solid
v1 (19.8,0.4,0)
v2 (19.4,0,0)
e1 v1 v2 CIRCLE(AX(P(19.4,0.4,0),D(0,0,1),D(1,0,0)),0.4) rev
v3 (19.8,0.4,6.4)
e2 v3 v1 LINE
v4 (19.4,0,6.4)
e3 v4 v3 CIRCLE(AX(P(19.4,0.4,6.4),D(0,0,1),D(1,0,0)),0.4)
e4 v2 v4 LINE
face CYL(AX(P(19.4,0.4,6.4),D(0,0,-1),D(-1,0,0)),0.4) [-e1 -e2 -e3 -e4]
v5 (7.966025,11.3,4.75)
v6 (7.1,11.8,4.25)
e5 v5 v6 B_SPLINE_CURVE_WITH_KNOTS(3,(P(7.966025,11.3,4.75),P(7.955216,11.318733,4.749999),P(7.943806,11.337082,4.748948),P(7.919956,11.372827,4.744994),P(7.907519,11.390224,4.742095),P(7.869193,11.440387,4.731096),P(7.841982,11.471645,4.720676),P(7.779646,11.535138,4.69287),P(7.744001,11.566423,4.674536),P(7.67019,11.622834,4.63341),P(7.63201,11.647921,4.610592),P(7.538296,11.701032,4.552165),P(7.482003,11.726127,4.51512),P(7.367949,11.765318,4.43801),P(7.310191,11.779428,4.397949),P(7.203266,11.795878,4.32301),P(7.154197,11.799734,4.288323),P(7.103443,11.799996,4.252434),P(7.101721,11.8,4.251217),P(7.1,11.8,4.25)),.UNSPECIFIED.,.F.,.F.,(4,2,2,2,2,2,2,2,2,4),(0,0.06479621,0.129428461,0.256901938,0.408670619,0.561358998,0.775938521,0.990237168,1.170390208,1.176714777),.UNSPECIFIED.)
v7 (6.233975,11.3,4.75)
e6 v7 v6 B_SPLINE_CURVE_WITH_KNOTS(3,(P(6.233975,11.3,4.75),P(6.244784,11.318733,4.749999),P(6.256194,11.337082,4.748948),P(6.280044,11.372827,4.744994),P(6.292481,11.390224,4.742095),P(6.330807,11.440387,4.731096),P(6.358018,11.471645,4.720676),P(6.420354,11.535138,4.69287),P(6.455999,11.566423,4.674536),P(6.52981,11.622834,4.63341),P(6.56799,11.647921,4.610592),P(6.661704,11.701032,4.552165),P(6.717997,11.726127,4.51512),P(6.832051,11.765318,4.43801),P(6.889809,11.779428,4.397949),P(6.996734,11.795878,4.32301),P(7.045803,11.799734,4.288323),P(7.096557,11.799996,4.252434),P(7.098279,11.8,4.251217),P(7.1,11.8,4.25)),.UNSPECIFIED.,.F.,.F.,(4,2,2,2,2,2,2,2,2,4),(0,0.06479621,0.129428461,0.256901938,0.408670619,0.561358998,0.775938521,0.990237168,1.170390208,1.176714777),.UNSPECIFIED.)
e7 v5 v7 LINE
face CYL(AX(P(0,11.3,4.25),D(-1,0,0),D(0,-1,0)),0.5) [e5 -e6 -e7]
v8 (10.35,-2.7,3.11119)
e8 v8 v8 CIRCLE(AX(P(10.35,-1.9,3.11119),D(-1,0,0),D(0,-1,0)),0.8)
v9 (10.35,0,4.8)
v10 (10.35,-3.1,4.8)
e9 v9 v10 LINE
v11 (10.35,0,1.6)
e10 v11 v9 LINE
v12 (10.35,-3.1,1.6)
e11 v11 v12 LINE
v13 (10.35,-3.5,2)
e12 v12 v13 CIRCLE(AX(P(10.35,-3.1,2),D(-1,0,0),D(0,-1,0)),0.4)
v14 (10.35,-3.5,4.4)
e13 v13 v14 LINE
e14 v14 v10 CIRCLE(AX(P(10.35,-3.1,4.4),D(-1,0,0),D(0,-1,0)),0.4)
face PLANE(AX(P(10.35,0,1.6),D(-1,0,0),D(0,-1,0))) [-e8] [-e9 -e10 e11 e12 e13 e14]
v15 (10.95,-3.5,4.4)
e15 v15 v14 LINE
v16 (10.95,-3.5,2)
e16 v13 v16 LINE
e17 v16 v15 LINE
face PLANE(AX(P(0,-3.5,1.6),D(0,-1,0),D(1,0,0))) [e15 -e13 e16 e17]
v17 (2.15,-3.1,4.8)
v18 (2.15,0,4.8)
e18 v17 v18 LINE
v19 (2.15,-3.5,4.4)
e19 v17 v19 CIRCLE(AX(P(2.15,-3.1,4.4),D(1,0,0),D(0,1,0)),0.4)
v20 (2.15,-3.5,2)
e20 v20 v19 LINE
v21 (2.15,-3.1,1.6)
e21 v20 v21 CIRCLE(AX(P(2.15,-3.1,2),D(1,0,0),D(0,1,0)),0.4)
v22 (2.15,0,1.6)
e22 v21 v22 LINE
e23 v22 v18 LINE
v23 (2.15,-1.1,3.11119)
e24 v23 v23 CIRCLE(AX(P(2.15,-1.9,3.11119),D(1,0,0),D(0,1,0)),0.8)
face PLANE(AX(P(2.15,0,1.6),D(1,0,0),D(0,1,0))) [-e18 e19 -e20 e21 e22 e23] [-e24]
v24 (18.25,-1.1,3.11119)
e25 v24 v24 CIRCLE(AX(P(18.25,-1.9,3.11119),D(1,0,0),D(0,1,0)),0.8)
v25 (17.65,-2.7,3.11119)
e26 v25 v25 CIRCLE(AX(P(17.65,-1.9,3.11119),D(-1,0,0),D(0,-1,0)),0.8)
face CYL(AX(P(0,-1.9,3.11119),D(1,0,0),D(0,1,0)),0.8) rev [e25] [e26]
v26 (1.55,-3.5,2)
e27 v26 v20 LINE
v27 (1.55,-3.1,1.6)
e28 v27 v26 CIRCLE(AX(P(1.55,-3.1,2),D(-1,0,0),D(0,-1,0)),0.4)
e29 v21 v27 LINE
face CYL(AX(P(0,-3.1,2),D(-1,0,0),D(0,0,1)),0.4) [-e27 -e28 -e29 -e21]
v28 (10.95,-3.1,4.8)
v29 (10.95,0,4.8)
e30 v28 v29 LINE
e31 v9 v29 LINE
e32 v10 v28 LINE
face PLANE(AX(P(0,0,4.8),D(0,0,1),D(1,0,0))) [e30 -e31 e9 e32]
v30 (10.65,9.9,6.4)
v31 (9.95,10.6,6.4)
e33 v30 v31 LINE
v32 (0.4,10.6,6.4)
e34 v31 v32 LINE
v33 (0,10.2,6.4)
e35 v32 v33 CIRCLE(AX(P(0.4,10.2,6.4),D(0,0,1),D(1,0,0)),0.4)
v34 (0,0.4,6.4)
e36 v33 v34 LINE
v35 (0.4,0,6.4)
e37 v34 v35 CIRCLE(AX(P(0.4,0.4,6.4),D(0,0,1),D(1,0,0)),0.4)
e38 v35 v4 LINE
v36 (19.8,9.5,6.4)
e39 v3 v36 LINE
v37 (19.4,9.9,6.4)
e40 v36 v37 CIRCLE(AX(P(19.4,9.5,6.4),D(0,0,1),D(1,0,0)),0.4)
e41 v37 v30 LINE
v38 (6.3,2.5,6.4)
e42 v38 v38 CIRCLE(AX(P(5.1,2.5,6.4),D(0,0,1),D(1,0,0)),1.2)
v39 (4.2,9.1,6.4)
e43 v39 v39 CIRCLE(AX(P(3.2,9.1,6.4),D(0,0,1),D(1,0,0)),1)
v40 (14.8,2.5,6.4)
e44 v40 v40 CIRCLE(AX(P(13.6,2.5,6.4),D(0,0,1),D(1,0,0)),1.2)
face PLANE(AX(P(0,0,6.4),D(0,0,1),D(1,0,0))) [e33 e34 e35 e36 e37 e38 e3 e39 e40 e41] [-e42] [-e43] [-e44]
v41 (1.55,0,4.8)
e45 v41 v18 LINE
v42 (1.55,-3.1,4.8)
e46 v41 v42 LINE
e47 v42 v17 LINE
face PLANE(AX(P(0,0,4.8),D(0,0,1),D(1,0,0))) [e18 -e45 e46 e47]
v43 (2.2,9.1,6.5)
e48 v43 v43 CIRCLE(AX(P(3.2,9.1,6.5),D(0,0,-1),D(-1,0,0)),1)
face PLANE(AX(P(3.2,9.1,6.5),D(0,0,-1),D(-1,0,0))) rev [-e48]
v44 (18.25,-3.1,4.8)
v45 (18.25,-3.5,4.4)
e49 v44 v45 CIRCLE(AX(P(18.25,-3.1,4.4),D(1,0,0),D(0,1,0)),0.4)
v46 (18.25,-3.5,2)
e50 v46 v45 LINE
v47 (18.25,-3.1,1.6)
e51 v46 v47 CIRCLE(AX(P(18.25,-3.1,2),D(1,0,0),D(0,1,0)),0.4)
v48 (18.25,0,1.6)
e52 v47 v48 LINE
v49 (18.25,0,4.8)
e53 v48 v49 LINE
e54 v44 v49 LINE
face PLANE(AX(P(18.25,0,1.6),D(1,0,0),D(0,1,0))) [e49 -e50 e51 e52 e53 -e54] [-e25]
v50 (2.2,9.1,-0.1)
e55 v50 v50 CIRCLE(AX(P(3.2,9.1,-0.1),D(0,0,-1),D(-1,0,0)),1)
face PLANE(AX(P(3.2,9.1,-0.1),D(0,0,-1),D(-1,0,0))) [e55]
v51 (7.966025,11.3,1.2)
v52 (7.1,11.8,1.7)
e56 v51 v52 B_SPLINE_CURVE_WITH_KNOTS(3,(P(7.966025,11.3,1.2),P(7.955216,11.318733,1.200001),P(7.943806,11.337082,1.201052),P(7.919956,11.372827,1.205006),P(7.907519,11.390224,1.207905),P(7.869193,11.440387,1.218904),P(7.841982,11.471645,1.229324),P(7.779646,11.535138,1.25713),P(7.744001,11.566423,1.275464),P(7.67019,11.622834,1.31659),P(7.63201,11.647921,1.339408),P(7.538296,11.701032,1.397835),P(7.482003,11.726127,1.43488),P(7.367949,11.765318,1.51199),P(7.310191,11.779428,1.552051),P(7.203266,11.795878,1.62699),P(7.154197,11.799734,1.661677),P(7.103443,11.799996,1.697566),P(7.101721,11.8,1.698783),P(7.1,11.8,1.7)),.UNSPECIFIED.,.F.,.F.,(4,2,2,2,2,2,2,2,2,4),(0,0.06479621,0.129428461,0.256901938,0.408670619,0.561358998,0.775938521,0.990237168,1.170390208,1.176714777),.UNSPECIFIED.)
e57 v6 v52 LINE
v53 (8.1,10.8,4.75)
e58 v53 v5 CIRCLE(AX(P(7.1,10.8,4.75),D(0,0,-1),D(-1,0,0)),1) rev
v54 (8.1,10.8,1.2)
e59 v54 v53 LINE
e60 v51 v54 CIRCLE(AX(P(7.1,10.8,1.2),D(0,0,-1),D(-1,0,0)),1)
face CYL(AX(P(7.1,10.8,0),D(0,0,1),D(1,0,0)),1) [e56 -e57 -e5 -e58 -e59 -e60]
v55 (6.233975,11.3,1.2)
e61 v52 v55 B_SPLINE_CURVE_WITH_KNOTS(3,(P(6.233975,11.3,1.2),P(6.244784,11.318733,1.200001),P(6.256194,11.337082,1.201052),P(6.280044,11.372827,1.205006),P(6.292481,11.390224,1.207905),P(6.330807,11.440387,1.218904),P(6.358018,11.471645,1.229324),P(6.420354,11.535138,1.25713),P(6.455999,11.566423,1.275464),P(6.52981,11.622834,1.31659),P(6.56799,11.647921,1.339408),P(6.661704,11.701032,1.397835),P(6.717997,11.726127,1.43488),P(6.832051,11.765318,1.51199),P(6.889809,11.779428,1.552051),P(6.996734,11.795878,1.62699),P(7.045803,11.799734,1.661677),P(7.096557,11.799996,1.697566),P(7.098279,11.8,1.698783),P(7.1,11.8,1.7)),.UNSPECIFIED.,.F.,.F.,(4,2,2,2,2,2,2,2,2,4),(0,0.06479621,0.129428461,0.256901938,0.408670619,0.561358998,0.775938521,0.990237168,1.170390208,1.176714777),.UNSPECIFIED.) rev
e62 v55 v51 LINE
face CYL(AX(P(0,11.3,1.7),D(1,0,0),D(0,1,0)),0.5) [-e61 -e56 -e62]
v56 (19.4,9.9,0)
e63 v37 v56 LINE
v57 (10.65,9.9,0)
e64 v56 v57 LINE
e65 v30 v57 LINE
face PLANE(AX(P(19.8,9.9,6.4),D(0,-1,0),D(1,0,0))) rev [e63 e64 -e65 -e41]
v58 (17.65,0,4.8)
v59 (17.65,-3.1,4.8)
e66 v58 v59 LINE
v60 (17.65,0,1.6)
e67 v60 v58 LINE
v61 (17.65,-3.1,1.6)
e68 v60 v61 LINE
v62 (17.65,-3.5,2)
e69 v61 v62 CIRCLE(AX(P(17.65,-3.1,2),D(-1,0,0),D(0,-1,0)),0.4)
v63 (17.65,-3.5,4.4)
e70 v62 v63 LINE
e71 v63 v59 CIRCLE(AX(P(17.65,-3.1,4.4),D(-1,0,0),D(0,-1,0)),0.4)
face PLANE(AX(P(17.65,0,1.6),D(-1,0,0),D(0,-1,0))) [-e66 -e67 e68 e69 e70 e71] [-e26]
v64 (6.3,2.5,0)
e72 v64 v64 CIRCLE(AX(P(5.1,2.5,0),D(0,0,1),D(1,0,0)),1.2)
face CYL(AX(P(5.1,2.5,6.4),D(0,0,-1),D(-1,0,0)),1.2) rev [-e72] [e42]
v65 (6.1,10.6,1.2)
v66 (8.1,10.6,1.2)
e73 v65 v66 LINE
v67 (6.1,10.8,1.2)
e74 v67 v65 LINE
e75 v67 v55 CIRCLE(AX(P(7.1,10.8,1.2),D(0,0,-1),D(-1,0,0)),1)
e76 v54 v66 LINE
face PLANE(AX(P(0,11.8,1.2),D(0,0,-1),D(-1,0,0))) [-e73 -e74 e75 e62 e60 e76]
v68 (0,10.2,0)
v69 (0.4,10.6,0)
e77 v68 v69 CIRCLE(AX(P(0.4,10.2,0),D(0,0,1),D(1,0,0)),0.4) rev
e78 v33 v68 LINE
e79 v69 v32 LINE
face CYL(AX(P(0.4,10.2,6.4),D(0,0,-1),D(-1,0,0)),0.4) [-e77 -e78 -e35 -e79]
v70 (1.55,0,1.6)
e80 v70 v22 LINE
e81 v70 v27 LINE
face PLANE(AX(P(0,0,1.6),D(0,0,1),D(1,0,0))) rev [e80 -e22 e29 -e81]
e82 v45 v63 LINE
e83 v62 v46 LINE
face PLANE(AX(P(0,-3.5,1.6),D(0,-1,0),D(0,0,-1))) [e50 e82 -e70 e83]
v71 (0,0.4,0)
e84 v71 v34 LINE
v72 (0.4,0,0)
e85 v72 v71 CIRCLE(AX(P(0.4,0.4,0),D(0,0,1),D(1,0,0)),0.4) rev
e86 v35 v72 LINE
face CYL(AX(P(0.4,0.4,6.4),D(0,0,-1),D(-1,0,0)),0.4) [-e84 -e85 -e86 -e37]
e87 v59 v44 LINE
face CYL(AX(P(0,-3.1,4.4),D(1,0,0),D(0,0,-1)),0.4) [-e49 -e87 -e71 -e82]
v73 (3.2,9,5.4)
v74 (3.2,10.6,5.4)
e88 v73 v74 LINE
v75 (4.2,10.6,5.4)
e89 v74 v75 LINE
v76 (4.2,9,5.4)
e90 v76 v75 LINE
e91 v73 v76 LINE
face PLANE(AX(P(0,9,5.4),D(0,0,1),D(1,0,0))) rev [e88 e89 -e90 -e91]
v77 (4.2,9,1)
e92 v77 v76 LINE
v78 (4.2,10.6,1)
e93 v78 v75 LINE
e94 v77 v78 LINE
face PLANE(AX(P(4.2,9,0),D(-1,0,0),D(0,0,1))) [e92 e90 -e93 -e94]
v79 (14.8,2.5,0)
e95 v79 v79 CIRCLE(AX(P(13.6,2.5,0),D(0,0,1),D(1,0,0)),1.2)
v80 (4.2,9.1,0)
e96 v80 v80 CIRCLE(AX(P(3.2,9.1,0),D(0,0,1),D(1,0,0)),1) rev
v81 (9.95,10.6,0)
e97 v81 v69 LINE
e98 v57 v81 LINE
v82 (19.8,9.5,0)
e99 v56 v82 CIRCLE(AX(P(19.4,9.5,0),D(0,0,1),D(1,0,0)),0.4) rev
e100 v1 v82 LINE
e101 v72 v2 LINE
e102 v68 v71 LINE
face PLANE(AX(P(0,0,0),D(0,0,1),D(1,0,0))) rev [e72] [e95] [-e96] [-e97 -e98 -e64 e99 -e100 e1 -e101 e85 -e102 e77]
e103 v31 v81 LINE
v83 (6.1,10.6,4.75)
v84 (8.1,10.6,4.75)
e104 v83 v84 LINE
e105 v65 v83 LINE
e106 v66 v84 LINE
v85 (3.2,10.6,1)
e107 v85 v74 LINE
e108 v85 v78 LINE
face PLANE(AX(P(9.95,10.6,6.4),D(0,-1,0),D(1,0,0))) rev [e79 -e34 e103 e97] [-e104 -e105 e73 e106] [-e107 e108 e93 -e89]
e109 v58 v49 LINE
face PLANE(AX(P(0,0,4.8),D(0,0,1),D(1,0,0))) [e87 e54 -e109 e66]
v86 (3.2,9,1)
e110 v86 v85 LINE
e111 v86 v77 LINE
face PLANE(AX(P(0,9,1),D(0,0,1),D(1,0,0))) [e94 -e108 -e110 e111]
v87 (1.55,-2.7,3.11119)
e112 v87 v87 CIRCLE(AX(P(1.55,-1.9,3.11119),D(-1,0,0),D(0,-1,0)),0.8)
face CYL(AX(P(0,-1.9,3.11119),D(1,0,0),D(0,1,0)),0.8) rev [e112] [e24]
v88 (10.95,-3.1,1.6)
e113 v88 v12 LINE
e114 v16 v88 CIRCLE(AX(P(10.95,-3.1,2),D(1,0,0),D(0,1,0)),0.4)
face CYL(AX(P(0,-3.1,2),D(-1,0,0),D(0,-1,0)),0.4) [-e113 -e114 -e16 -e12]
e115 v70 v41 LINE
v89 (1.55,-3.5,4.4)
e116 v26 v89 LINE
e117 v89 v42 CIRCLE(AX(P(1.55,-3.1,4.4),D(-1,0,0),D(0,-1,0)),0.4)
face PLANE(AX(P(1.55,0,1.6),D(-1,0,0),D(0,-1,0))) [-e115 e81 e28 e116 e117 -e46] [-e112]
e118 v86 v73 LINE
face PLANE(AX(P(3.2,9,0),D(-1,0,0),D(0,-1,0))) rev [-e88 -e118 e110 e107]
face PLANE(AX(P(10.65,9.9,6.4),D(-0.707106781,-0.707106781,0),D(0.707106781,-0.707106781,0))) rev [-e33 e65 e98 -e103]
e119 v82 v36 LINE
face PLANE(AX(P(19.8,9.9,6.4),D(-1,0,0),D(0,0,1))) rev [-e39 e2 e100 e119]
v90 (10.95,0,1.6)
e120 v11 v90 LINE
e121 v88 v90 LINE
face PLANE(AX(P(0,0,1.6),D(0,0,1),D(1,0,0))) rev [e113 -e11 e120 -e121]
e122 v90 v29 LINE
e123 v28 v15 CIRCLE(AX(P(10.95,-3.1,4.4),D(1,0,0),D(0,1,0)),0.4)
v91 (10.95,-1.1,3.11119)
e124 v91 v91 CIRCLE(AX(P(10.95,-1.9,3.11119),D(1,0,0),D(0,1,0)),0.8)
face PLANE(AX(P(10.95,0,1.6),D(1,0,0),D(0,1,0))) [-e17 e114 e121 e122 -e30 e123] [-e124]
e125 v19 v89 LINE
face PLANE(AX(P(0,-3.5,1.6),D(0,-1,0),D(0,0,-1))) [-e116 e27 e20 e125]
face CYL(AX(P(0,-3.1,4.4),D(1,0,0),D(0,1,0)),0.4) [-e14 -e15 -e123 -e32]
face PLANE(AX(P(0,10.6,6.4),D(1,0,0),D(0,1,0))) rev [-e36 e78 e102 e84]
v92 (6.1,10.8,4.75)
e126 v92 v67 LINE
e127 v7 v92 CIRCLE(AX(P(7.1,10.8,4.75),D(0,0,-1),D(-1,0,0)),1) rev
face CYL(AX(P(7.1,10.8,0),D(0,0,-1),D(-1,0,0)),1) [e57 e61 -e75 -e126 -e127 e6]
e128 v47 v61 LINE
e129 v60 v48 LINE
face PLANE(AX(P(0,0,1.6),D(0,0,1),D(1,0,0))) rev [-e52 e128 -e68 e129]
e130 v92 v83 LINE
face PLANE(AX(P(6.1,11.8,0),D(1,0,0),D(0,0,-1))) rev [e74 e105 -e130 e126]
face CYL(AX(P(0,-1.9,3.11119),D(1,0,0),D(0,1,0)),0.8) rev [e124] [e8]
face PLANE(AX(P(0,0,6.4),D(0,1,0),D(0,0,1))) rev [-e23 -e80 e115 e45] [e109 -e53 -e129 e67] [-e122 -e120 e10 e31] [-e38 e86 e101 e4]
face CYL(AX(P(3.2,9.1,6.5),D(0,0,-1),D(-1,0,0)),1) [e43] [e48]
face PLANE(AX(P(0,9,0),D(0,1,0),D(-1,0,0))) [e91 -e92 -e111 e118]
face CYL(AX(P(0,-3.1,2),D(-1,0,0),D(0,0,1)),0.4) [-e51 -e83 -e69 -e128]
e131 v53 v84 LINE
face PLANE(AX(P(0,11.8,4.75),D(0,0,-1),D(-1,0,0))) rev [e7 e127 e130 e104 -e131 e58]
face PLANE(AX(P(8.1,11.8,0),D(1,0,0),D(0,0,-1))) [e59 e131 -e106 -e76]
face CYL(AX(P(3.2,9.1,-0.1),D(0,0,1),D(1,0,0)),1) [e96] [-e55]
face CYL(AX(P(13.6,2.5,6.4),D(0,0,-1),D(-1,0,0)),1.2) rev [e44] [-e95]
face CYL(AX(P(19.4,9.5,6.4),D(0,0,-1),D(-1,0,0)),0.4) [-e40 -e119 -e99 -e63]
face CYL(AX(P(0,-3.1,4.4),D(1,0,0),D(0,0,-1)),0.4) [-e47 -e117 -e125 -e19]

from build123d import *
from OCP.BRepFilletAPI import BRepFilletAPI_MakeFillet

# Parameters (mm, degrees)
ESQUISSE1_R             = 1.2
BOSS_EXTRU_1_DEPTH      = 6.4
BOSS_EXTRU_2_START      = -3.2
ESQUISSE4_W             = 0.6
ESQUISSE4_H             = 3.5
BOSS_EXTRU_2_DEPTH      = 1.6
ESQUISSE5_R             = 0.8
ENL_V_MAT_EXTRU_1_DEPTH = 23.054081255
ESQUISSE6_W             = 1
ESQUISSE6_H             = 4.4
ENL_V_MAT_EXTRU_2_DEPTH = 1.6
ESQUISSE6_3_W           = 2
ESQUISSE6_3_H           = 3.55
BOSS_EXTRU_3_DEPTH      = 1.2
CONG_2_R                = 1
CONG_2_R_2              = 0.5
ESQUISSE7_R             = 1
BOSS_EXTRU_9_DEPTH      = 0.1
BOSS_EXTRU_10_START     = -6.5
ESQUISSE7_3_R           = 1
BOSS_EXTRU_10_DEPTH     = 0.1
CONG_1_R                = 0.4


with BuildPart() as part:
    # Esquisse1 → Boss.-Extru.1 (new body)
    with BuildSketch(Plane.XY):
        Polygon((0, 0), (19.8, 0), (19.8, 9.9), (10.65, 9.9), (9.95, 10.6), (0, 10.6), align=None)
        with Locations((5.1, 2.5)):
            Circle(ESQUISSE1_R, mode=Mode.SUBTRACT)
        with Locations((13.6, 2.5)):
            Circle(ESQUISSE1_R, mode=Mode.SUBTRACT)
    extrude(amount=BOSS_EXTRU_1_DEPTH)

    # Esquisse4 → Boss.-Extru.2 (add, symmetric)
    with BuildSketch(Plane.XY.offset(6.4).offset(BOSS_EXTRU_2_START)):
        with Locations((17.95, -1.75)):
            Rectangle(ESQUISSE4_W, ESQUISSE4_H)
        with Locations((10.65, -1.75)):
            Rectangle(ESQUISSE4_W, ESQUISSE4_H)
        with Locations((1.85, -1.75)):
            Rectangle(ESQUISSE4_W, ESQUISSE4_H)
    extrude(amount=BOSS_EXTRU_2_DEPTH, both=True)

    # Esquisse5 → Enlèv. mat.-Extru.1 (cut, through all)
    with BuildSketch(Plane(origin=(18.25, 0, 0), x_dir=(0, 0, -1), z_dir=(1, 0, 0))):
        with Locations(Location((-3.111189777, -1.9, 0), (0, 0, 90))):
            Circle(ESQUISSE5_R)
    extrude(amount=-ENL_V_MAT_EXTRU_1_DEPTH, mode=Mode.SUBTRACT)

    # Esquisse6 → Enlèv. mat.-Extru.2 (cut)
    with BuildSketch(Plane(origin=(0, 10.6, 0), x_dir=(1, 0, 0), z_dir=(0, 1, 0))):
        with Locations((3.7, -3.2)):
            Rectangle(ESQUISSE6_W, ESQUISSE6_H)
    extrude(amount=-ENL_V_MAT_EXTRU_2_DEPTH, mode=Mode.SUBTRACT)

    # Esquisse6<3> → Boss.-Extru.3 (add)
    with BuildSketch(Plane(origin=(0, 10.6, 0), x_dir=(1, 0, 0), z_dir=(0, 1, 0))):
        with Locations((7.1, -2.975)):
            Rectangle(ESQUISSE6_3_W, ESQUISSE6_3_H)
    extrude(amount=BOSS_EXTRU_3_DEPTH)

    # Congé2
    cong_2_edges_1 = [part.edges().sort_by_distance(p)[0] for p in [
        (8.1, 11.8, 2.975),
        (6.1, 11.8, 2.975),
    ]]
    cong_2_edges_2 = [part.edges().sort_by_distance(p)[0] for p in [
        (7.1, 11.8, 4.75),
        (7.1, 11.8, 1.2),
    ]]
    cong_2 = BRepFilletAPI_MakeFillet(part.part.solid().wrapped)
    for e in cong_2_edges_1:
        cong_2.Add(CONG_2_R - 0.0001, e.wrapped)
    for e in cong_2_edges_2:
        cong_2.Add(CONG_2_R_2 - 0.0001, e.wrapped)
    add(Compound.cast(cong_2.Shape()), mode=Mode.REPLACE)  # a hair under: the kernel refuses the full size

    # Esquisse7 → Boss.-Extru.9 (add)
    with BuildSketch(Plane(origin=(0, 0, 0), x_dir=(-1, 0, 0), z_dir=(0, 0, -1))):
        with Locations(Location((-3.2, 9.1, 0), (0, 0, 180))):
            Circle(ESQUISSE7_R)
    extrude(amount=BOSS_EXTRU_9_DEPTH)

    # Esquisse7<3> → Boss.-Extru.10 (add)
    with BuildSketch(Plane(origin=(0, 0, 0), x_dir=(-1, 0, 0), z_dir=(0, 0, -1)).offset(BOSS_EXTRU_10_START)):
        with Locations(Location((-3.2, 9.1, 0), (0, 0, 180))):
            Circle(ESQUISSE7_3_R)
    extrude(amount=BOSS_EXTRU_10_DEPTH)

    # Congé1
    cong_1_edges = [part.edges().sort_by_distance(p)[0] for p in [
        (0, 10.6, 3.2),
        (19.8, 9.9, 3.2),
        (19.8, 0, 3.2),
        (0, 0, 3.2),
        (17.95, -3.5, 1.6),
        (17.95, -3.5, 4.8),
        (10.65, -3.5, 1.6),
        (10.65, -3.5, 4.8),
        (1.85, -3.5, 1.6),
        (1.85, -3.5, 4.8),
    ]]
    fillet(cong_1_edges, radius=CONG_1_R)


solid = part.part
